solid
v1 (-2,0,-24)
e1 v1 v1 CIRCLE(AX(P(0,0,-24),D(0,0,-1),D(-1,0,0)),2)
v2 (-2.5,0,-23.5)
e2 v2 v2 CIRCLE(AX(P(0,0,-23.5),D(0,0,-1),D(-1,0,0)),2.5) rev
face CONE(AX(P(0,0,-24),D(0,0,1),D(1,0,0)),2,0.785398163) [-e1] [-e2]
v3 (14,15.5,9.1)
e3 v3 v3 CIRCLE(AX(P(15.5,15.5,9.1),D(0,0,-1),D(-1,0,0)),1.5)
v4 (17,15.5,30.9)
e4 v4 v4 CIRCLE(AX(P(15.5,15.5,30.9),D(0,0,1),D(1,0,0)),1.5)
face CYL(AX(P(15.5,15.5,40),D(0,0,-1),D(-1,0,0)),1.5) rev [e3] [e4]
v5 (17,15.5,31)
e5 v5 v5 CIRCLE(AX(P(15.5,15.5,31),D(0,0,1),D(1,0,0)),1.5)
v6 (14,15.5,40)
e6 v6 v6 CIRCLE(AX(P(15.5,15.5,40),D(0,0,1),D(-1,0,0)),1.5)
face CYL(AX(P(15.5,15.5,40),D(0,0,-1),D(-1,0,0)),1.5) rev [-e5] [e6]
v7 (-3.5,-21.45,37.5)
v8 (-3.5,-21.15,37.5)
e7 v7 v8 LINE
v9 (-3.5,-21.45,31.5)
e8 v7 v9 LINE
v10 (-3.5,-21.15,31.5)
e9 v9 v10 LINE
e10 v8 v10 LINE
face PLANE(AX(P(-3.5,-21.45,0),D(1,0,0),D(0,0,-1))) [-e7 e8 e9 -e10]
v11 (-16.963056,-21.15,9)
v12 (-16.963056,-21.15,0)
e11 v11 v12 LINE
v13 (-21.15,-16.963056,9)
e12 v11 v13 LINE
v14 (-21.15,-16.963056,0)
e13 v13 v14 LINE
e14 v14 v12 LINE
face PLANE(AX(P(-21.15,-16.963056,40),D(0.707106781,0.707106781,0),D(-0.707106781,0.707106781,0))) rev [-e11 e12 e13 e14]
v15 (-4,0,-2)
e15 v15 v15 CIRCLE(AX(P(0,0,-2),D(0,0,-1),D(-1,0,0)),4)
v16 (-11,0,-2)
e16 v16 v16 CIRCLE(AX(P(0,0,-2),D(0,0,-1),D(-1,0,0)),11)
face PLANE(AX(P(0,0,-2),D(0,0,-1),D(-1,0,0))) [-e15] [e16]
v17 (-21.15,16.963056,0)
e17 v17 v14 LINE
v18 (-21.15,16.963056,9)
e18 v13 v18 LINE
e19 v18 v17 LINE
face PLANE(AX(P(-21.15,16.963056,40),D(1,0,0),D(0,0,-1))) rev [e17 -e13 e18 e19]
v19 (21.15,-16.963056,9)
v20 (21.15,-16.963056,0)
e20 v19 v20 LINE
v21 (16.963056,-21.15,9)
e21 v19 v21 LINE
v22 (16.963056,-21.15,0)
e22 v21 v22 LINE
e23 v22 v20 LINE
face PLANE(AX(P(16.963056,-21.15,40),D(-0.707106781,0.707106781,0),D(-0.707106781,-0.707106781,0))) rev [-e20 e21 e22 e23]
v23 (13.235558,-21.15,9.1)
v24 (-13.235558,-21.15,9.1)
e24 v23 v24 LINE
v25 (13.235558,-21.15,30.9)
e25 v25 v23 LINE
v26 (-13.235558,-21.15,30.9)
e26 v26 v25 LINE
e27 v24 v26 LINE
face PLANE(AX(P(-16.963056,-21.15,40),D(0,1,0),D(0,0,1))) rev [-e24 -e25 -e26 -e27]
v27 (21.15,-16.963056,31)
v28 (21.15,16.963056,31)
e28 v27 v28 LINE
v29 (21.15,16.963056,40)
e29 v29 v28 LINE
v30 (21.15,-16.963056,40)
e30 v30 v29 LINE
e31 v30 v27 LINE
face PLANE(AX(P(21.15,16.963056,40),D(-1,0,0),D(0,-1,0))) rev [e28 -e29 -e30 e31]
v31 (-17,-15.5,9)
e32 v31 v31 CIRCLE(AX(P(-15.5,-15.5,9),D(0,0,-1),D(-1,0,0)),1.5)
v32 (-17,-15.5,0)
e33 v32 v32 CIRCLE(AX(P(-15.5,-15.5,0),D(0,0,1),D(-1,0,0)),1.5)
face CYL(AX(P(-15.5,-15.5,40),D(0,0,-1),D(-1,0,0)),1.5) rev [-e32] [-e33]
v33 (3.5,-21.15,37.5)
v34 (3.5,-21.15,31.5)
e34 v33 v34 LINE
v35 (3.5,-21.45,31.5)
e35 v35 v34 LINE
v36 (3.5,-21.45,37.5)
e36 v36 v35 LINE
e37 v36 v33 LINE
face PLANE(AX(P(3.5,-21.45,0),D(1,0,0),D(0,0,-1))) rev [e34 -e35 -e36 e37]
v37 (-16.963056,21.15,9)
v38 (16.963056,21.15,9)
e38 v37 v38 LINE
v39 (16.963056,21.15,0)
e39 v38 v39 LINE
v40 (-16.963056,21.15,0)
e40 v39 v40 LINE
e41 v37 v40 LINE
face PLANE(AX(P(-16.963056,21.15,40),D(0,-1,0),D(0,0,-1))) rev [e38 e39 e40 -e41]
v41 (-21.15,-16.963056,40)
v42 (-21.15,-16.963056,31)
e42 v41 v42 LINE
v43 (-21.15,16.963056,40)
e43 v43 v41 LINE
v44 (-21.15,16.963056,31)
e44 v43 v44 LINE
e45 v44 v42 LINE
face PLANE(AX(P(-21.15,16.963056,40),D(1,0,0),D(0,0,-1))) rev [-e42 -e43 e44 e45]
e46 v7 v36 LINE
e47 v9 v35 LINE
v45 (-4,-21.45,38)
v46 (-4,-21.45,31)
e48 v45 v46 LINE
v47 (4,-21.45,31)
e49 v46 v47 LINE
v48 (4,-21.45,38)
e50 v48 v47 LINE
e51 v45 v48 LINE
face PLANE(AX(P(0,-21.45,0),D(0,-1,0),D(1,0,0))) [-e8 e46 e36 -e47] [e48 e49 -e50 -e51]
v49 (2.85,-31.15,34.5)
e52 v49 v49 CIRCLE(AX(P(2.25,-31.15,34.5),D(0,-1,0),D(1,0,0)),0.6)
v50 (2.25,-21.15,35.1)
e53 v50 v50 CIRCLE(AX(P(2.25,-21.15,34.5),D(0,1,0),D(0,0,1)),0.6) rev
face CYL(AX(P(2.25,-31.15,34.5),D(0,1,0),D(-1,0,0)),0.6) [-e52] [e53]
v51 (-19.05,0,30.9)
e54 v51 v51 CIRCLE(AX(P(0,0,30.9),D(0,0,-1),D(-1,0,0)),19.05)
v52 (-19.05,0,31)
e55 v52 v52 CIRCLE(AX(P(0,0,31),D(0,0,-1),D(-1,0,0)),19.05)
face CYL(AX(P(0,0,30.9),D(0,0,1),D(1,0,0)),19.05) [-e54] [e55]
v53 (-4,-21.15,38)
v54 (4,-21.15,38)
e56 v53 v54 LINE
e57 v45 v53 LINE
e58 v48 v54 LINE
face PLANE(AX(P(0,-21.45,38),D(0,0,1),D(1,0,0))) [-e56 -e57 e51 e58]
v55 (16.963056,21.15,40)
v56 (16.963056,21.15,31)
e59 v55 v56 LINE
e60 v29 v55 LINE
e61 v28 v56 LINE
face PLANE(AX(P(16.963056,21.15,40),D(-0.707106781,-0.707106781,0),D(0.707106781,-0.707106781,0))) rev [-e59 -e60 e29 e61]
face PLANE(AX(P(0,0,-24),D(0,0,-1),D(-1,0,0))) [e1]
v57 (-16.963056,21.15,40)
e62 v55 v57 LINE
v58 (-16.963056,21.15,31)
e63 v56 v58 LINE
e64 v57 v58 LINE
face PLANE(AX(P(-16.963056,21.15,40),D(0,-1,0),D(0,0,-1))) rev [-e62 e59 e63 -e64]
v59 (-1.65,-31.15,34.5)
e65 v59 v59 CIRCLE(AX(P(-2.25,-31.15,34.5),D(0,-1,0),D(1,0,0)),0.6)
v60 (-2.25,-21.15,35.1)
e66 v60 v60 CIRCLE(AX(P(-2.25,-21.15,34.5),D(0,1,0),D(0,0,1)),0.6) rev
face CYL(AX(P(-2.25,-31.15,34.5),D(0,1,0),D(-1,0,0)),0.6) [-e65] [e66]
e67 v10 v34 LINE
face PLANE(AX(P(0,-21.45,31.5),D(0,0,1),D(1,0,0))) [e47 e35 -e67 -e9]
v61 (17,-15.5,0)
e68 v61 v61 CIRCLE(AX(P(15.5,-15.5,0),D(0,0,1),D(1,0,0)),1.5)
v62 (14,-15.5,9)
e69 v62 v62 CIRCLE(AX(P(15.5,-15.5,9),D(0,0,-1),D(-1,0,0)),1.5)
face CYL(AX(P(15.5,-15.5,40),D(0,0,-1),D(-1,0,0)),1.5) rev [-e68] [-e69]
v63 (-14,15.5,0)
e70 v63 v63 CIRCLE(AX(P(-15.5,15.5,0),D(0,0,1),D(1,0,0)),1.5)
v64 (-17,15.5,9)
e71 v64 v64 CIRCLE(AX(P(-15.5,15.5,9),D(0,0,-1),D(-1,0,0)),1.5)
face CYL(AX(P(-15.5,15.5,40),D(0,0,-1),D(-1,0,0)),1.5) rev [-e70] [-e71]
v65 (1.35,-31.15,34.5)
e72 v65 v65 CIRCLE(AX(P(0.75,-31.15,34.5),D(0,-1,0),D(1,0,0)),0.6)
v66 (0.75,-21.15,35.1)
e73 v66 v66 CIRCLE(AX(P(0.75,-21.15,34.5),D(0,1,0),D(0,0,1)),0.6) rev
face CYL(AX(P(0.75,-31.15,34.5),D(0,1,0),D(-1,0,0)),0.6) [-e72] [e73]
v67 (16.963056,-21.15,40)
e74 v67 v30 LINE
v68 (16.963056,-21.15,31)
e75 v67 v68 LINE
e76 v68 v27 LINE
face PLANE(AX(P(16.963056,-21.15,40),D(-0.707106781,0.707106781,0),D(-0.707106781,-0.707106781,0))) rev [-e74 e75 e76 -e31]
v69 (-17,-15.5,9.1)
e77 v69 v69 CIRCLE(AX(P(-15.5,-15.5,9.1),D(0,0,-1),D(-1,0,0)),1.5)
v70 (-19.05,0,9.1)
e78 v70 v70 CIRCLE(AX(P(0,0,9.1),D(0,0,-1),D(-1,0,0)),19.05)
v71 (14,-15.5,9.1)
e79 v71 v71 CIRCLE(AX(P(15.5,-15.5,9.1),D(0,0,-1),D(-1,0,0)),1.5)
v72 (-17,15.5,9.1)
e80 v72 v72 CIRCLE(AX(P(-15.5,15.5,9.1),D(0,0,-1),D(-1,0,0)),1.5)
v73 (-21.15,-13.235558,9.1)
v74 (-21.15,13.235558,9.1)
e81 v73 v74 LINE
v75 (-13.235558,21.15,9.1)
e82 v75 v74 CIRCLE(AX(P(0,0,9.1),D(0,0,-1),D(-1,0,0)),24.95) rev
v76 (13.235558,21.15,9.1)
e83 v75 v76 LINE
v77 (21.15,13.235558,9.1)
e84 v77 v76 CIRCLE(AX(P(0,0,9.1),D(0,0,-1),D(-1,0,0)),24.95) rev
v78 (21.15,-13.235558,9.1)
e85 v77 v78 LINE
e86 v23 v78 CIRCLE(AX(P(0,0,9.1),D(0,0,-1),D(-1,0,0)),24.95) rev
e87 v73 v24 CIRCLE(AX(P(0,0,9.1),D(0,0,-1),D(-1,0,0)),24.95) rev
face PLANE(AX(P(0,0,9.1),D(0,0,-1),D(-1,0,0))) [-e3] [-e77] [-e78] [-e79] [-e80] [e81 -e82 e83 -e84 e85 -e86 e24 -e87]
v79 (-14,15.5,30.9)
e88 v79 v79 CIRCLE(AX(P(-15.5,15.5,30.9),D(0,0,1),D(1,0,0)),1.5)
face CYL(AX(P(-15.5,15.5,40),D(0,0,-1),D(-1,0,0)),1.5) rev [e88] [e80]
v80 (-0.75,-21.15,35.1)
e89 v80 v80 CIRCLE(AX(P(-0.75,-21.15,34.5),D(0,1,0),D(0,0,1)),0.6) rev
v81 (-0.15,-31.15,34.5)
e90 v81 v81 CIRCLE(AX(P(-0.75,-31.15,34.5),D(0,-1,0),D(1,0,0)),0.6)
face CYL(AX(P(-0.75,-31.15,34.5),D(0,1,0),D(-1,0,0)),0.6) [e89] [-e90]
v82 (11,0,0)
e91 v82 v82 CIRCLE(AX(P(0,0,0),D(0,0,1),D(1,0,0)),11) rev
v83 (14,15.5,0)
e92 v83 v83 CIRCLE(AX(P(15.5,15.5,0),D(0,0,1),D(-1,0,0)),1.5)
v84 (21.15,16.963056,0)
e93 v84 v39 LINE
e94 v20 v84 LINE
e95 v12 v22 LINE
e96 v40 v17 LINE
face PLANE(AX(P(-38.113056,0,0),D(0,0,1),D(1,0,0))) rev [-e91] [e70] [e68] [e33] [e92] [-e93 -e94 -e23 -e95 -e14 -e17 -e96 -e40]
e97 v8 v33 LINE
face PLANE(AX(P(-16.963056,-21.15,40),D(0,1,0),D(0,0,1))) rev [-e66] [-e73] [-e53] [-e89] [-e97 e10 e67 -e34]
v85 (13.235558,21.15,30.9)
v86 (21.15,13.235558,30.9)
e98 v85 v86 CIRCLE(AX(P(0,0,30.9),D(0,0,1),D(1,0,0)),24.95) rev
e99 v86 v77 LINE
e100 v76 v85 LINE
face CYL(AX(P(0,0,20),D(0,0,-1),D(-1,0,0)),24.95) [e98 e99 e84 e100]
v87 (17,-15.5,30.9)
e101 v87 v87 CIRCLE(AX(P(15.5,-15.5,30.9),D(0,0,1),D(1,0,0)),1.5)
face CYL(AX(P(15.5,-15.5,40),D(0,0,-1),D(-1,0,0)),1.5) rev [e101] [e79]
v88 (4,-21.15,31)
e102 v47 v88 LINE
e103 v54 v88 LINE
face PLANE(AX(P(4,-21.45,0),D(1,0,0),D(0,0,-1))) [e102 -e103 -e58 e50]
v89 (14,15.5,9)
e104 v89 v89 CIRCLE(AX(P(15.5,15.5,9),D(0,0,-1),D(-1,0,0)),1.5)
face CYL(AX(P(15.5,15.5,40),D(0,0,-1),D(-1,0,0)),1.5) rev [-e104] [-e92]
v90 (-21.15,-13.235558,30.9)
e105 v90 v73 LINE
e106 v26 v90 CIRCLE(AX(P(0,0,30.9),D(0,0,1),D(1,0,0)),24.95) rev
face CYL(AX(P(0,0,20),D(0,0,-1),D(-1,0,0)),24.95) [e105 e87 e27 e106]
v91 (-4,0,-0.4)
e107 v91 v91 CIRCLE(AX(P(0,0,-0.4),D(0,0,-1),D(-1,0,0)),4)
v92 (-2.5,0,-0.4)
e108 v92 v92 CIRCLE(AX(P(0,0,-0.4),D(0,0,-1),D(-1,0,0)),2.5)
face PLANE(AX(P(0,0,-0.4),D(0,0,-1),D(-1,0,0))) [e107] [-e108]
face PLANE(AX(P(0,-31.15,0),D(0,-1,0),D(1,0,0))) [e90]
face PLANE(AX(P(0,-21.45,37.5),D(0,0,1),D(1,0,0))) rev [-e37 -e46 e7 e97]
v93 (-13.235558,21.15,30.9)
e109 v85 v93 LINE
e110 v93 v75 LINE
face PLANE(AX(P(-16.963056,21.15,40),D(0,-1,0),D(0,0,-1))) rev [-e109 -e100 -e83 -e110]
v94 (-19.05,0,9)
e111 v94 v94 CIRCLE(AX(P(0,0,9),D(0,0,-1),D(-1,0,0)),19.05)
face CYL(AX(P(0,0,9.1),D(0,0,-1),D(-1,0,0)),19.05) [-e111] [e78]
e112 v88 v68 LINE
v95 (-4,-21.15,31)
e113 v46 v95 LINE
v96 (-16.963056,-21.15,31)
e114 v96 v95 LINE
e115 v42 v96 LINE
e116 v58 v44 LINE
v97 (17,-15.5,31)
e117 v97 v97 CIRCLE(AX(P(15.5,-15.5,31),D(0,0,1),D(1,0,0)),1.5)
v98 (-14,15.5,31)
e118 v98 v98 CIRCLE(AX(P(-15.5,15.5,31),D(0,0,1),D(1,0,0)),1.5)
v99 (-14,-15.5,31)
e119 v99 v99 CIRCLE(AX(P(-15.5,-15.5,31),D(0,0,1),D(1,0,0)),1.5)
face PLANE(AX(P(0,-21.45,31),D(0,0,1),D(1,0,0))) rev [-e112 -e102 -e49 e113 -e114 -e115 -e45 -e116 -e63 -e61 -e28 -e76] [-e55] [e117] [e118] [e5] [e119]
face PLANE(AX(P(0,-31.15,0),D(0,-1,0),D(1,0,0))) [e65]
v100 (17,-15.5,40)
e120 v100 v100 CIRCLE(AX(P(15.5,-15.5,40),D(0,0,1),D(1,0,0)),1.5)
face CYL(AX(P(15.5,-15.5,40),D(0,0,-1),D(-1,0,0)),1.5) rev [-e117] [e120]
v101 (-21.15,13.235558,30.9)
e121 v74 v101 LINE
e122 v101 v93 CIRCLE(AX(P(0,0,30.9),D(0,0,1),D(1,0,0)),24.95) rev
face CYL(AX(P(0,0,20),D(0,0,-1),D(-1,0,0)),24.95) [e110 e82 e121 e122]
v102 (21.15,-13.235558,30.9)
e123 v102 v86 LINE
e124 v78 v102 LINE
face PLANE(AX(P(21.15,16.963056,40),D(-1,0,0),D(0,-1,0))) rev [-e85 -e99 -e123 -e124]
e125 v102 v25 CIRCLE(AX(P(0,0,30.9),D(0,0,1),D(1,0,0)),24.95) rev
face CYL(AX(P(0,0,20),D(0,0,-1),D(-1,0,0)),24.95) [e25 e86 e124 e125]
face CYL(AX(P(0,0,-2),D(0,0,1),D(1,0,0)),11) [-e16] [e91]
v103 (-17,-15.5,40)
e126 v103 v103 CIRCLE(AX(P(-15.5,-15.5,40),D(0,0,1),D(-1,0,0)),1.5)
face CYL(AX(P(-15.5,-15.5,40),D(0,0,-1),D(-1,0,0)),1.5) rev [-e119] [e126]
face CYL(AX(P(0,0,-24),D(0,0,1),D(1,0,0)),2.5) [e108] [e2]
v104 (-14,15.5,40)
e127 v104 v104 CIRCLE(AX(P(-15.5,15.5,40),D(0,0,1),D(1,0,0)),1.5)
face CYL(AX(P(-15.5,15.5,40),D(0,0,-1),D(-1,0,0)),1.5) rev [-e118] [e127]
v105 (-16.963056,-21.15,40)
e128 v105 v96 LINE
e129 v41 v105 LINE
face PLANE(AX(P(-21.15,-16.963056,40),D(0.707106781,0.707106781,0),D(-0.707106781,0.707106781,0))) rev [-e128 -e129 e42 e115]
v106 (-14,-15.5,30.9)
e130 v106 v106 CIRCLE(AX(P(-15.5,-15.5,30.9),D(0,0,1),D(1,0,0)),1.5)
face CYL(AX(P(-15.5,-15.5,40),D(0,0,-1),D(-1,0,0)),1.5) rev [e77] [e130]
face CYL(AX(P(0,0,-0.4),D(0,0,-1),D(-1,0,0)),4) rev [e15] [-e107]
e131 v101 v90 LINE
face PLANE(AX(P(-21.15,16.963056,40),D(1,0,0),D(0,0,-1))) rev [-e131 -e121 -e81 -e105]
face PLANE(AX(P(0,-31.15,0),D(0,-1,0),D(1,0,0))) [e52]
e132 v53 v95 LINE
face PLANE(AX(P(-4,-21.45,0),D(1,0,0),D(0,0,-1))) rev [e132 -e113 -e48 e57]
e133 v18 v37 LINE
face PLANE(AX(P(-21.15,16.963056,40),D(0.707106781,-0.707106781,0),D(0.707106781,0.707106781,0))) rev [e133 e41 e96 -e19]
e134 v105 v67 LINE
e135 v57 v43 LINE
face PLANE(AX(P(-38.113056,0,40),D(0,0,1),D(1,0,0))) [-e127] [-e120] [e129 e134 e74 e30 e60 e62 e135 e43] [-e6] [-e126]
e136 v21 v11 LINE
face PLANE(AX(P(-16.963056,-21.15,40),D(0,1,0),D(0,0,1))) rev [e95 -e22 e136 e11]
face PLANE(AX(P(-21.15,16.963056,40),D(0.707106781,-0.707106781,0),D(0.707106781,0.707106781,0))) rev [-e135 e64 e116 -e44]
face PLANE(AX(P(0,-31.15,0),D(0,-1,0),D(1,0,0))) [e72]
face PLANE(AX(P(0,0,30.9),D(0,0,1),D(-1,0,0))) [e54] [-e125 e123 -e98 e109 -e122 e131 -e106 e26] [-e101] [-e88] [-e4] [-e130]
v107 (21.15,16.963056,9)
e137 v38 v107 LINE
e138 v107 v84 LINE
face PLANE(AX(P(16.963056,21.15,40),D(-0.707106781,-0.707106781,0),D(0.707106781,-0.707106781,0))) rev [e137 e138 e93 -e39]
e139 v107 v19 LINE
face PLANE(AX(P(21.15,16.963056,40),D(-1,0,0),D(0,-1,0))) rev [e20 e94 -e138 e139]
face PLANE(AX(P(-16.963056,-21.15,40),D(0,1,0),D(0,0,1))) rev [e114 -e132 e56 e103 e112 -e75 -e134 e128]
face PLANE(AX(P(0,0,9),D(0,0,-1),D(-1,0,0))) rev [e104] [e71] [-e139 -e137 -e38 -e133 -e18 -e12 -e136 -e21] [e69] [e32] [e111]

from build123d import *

# Parameters (mm, degrees)
ESQUISSE1_R             = 1.5
EXTRUSION1_DEPTH        = 40
ESQUISSE10_W            = 8
ESQUISSE10_H            = 7
ESQUISSE10_W_2          = 7
ESQUISSE10_H_2          = 6
BOSS_EXTRU_2_DEPTH      = 0.3
ESQUISSE2_R             = 11
EXTRUSION2_DEPTH        = 2
ESQUISSE3_R             = 2.5
EXTRUSION3_DEPTH        = 22
ENL_V_START             = -1.6
ESQUISSE4_R             = 4
ESQUISSE4_R_2           = 2.5
ENL_V_MAT_EXTRU_1_DEPTH = 1.6
CHANFREIN1_SIZE         = 0.5
ESQUISSE6_R             = 34.95
ESQUISSE6_R_2           = 24.95
ENL_V_MAT_EXTRU_3_DEPTH = 11
ESQUISSE7_R             = 25.05
ESQUISSE7_R_2           = 19.05
ENL_V_MAT_EXTRU_4_DEPTH = 0.1
SYM_TRIE1_START         = 20
SYM_TRIE1_DEPTH         = 11
SYM_TRIE1_START_2       = 30.9
SYM_TRIE1_2_OUTLINE_R   = 1.5
SYM_TRIE1_2_OUTLINE_R_2 = 19.05
SYM_TRIE1_2_DEPTH       = 0.1
ESQUISSE10_3_R          = 0.6
BOSS_EXTRU_3_DEPTH      = 10


# Read off the part's stored shape, not the designer's step: Symétrie1
with BuildPart() as part:
    # Esquisse1 → Extrusion1 (new body)
    with BuildSketch(Plane.XY):
        Polygon((-16.963055506, 21.15), (16.963055506, 21.15), (21.15, 16.963055506), (21.15, -16.963055506), (16.963055506, -21.15), (-16.963055506, -21.15), (-21.15, -16.963055506), (-21.15, 16.963055506), align=None)
        with Locations((-15.5, 15.5)):
            Circle(ESQUISSE1_R, mode=Mode.SUBTRACT)
        with Locations((15.5, -15.5)):
            Circle(ESQUISSE1_R, mode=Mode.SUBTRACT)
        with Locations(Location((-15.5, -15.5, 0), (0, 0, 180))):
            Circle(ESQUISSE1_R, mode=Mode.SUBTRACT)
        with Locations(Location((15.5, 15.5, 0), (0, 0, 180))):
            Circle(ESQUISSE1_R, mode=Mode.SUBTRACT)
    extrude(amount=EXTRUSION1_DEPTH)

    # Esquisse10 → Boss.-Extru.2 (add)
    with BuildSketch(Plane.XZ.offset(21.15)):
        with Locations((0, 34.5)):
            Rectangle(ESQUISSE10_W, ESQUISSE10_H)
        with Locations((0, 34.5)):
            Rectangle(ESQUISSE10_W_2, ESQUISSE10_H_2, mode=Mode.SUBTRACT)
    extrude(amount=BOSS_EXTRU_2_DEPTH)

    # Esquisse2 → Extrusion2 (add)
    with BuildSketch(Plane(origin=(0, 0, 0), x_dir=(-1, 0, 0), z_dir=(0, 0, -1))):
        with Locations(Location((0, 0, 0), (0, 0, 180))):
            Circle(ESQUISSE2_R)
    extrude(amount=EXTRUSION2_DEPTH)

    # Esquisse3 → Extrusion3 (add)
    with BuildSketch(Plane(origin=(0, 0, -2), x_dir=(-1, 0, 0), z_dir=(0, 0, -1))):
        Circle(ESQUISSE3_R)
    extrude(amount=EXTRUSION3_DEPTH)

    # Esquisse4 → Enlèv. mat.-Extru.1 (cut)
    with BuildSketch(Plane(origin=(0, 0, -2), x_dir=(-1, 0, 0), z_dir=(0, 0, -1)).offset(ENL_V_START)):
        Circle(ESQUISSE4_R)
        Circle(ESQUISSE4_R_2, mode=Mode.SUBTRACT)
    extrude(amount=ENL_V_MAT_EXTRU_1_DEPTH, mode=Mode.SUBTRACT)

    # Chanfrein1
    chanfrein1_edges = [part.edges().sort_by_distance(p)[0] for p in [
        (2.5, 0, -24),
    ]]
    chamfer(chanfrein1_edges, length=CHANFREIN1_SIZE)

    # Esquisse6 → Enlèv. mat.-Extru.3 (cut)
    with BuildSketch(Plane(origin=(0, 0, 9), x_dir=(-1, 0, 0), z_dir=(0, 0, -1))):
        Circle(ESQUISSE6_R)
        Circle(ESQUISSE6_R_2, mode=Mode.SUBTRACT)
    extrude(amount=-ENL_V_MAT_EXTRU_3_DEPTH, mode=Mode.SUBTRACT)

    # Esquisse7 → Enlèv. mat.-Extru.4 (cut)
    with BuildSketch(Plane(origin=(0, 0, 9), x_dir=(-1, 0, 0), z_dir=(0, 0, -1))):
        Circle(ESQUISSE7_R)
        Circle(ESQUISSE7_R_2, mode=Mode.SUBTRACT)
    extrude(amount=-ENL_V_MAT_EXTRU_4_DEPTH, mode=Mode.SUBTRACT)

    # Symétrie1 outline → Symétrie1 (cut)
    with BuildSketch(Plane.XY.offset(SYM_TRIE1_START)):
        with BuildLine():
            Line((21.15, -16.963055506), (21.15, -13.235558167))
            ThreePointArc((21.15, -13.235558167), (17.642314191, -17.642314191), (13.235558167, -21.15))
            Line((13.235558167, -21.15), (16.963055506, -21.15))
            Line((16.963055506, -21.15), (21.15, -16.963055506))
        make_face()
        with BuildLine():
            ThreePointArc((13.235558167, 21.15), (17.642314191, 17.642314191), (21.15, 13.235558167))
            Line((21.15, 13.235558167), (21.15, 16.963055506))
            Line((21.15, 16.963055506), (16.963055506, 21.15))
            Line((16.963055506, 21.15), (13.235558167, 21.15))
        make_face()
        with BuildLine():
            Line((-16.963055506, -21.15), (-13.235558167, -21.15))
            ThreePointArc((-13.235558167, -21.15), (-17.642314191, -17.642314191), (-21.15, -13.235558167))
            Line((-21.15, -13.235558167), (-21.15, -16.963055506))
            Line((-21.15, -16.963055506), (-16.963055506, -21.15))
        make_face()
        with BuildLine():
            ThreePointArc((-21.15, 13.235558167), (-17.642314191, 17.642314191), (-13.235558167, 21.15))
            Line((-13.235558167, 21.15), (-16.963055506, 21.15))
            Line((-16.963055506, 21.15), (-21.15, 16.963055506))
            Line((-21.15, 16.963055506), (-21.15, 13.235558167))
        make_face()
    extrude(amount=SYM_TRIE1_DEPTH, mode=Mode.SUBTRACT)

    # Sym_trie1 2 outline → Sym_trie1 2 (cut)
    with BuildSketch(Plane.XY.offset(SYM_TRIE1_START_2)):
        with BuildLine():
            ThreePointArc((13.235558167, -21.15), (17.642314191, -17.642314191), (21.15, -13.235558167))
            Line((21.15, -13.235558167), (21.15, 13.235558167))
            ThreePointArc((21.15, 13.235558167), (17.642314191, 17.642314191), (13.235558167, 21.15))
            Line((13.235558167, 21.15), (-13.235558167, 21.15))
            ThreePointArc((-13.235558167, 21.15), (-17.642314191, 17.642314191), (-21.15, 13.235558167))
            Line((-21.15, 13.235558167), (-21.15, -13.235558167))
            ThreePointArc((-21.15, -13.235558167), (-17.642314191, -17.642314191), (-13.235558167, -21.15))
            Line((-13.235558167, -21.15), (13.235558167, -21.15))
        make_face()
        with Locations((-15.5, -15.5)):
            Circle(SYM_TRIE1_2_OUTLINE_R, mode=Mode.SUBTRACT)
        with Locations((15.5, -15.5)):
            Circle(SYM_TRIE1_2_OUTLINE_R, mode=Mode.SUBTRACT)
        with Locations((-15.5, 15.5)):
            Circle(SYM_TRIE1_2_OUTLINE_R, mode=Mode.SUBTRACT)
        Circle(SYM_TRIE1_2_OUTLINE_R_2, mode=Mode.SUBTRACT)
        with Locations((15.5, 15.5)):
            Circle(SYM_TRIE1_2_OUTLINE_R, mode=Mode.SUBTRACT)
    extrude(amount=SYM_TRIE1_2_DEPTH, mode=Mode.SUBTRACT)

    # Esquisse10<3> → Boss.-Extru.3 (add)
    with BuildSketch(Plane.XZ.offset(21.15)):
        with Locations(Location((2.25, 34.5, 0), (0, 0, 90))):
            Circle(ESQUISSE10_3_R)
        with Locations(Location((0.75, 34.5, 0), (0, 0, 90))):
            Circle(ESQUISSE10_3_R)
        with Locations(Location((-0.75, 34.5, 0), (0, 0, 90))):
            Circle(ESQUISSE10_3_R)
        with Locations(Location((-2.25, 34.5, 0), (0, 0, 90))):
            Circle(ESQUISSE10_3_R)
    extrude(amount=BOSS_EXTRU_3_DEPTH)


solid = part.part
